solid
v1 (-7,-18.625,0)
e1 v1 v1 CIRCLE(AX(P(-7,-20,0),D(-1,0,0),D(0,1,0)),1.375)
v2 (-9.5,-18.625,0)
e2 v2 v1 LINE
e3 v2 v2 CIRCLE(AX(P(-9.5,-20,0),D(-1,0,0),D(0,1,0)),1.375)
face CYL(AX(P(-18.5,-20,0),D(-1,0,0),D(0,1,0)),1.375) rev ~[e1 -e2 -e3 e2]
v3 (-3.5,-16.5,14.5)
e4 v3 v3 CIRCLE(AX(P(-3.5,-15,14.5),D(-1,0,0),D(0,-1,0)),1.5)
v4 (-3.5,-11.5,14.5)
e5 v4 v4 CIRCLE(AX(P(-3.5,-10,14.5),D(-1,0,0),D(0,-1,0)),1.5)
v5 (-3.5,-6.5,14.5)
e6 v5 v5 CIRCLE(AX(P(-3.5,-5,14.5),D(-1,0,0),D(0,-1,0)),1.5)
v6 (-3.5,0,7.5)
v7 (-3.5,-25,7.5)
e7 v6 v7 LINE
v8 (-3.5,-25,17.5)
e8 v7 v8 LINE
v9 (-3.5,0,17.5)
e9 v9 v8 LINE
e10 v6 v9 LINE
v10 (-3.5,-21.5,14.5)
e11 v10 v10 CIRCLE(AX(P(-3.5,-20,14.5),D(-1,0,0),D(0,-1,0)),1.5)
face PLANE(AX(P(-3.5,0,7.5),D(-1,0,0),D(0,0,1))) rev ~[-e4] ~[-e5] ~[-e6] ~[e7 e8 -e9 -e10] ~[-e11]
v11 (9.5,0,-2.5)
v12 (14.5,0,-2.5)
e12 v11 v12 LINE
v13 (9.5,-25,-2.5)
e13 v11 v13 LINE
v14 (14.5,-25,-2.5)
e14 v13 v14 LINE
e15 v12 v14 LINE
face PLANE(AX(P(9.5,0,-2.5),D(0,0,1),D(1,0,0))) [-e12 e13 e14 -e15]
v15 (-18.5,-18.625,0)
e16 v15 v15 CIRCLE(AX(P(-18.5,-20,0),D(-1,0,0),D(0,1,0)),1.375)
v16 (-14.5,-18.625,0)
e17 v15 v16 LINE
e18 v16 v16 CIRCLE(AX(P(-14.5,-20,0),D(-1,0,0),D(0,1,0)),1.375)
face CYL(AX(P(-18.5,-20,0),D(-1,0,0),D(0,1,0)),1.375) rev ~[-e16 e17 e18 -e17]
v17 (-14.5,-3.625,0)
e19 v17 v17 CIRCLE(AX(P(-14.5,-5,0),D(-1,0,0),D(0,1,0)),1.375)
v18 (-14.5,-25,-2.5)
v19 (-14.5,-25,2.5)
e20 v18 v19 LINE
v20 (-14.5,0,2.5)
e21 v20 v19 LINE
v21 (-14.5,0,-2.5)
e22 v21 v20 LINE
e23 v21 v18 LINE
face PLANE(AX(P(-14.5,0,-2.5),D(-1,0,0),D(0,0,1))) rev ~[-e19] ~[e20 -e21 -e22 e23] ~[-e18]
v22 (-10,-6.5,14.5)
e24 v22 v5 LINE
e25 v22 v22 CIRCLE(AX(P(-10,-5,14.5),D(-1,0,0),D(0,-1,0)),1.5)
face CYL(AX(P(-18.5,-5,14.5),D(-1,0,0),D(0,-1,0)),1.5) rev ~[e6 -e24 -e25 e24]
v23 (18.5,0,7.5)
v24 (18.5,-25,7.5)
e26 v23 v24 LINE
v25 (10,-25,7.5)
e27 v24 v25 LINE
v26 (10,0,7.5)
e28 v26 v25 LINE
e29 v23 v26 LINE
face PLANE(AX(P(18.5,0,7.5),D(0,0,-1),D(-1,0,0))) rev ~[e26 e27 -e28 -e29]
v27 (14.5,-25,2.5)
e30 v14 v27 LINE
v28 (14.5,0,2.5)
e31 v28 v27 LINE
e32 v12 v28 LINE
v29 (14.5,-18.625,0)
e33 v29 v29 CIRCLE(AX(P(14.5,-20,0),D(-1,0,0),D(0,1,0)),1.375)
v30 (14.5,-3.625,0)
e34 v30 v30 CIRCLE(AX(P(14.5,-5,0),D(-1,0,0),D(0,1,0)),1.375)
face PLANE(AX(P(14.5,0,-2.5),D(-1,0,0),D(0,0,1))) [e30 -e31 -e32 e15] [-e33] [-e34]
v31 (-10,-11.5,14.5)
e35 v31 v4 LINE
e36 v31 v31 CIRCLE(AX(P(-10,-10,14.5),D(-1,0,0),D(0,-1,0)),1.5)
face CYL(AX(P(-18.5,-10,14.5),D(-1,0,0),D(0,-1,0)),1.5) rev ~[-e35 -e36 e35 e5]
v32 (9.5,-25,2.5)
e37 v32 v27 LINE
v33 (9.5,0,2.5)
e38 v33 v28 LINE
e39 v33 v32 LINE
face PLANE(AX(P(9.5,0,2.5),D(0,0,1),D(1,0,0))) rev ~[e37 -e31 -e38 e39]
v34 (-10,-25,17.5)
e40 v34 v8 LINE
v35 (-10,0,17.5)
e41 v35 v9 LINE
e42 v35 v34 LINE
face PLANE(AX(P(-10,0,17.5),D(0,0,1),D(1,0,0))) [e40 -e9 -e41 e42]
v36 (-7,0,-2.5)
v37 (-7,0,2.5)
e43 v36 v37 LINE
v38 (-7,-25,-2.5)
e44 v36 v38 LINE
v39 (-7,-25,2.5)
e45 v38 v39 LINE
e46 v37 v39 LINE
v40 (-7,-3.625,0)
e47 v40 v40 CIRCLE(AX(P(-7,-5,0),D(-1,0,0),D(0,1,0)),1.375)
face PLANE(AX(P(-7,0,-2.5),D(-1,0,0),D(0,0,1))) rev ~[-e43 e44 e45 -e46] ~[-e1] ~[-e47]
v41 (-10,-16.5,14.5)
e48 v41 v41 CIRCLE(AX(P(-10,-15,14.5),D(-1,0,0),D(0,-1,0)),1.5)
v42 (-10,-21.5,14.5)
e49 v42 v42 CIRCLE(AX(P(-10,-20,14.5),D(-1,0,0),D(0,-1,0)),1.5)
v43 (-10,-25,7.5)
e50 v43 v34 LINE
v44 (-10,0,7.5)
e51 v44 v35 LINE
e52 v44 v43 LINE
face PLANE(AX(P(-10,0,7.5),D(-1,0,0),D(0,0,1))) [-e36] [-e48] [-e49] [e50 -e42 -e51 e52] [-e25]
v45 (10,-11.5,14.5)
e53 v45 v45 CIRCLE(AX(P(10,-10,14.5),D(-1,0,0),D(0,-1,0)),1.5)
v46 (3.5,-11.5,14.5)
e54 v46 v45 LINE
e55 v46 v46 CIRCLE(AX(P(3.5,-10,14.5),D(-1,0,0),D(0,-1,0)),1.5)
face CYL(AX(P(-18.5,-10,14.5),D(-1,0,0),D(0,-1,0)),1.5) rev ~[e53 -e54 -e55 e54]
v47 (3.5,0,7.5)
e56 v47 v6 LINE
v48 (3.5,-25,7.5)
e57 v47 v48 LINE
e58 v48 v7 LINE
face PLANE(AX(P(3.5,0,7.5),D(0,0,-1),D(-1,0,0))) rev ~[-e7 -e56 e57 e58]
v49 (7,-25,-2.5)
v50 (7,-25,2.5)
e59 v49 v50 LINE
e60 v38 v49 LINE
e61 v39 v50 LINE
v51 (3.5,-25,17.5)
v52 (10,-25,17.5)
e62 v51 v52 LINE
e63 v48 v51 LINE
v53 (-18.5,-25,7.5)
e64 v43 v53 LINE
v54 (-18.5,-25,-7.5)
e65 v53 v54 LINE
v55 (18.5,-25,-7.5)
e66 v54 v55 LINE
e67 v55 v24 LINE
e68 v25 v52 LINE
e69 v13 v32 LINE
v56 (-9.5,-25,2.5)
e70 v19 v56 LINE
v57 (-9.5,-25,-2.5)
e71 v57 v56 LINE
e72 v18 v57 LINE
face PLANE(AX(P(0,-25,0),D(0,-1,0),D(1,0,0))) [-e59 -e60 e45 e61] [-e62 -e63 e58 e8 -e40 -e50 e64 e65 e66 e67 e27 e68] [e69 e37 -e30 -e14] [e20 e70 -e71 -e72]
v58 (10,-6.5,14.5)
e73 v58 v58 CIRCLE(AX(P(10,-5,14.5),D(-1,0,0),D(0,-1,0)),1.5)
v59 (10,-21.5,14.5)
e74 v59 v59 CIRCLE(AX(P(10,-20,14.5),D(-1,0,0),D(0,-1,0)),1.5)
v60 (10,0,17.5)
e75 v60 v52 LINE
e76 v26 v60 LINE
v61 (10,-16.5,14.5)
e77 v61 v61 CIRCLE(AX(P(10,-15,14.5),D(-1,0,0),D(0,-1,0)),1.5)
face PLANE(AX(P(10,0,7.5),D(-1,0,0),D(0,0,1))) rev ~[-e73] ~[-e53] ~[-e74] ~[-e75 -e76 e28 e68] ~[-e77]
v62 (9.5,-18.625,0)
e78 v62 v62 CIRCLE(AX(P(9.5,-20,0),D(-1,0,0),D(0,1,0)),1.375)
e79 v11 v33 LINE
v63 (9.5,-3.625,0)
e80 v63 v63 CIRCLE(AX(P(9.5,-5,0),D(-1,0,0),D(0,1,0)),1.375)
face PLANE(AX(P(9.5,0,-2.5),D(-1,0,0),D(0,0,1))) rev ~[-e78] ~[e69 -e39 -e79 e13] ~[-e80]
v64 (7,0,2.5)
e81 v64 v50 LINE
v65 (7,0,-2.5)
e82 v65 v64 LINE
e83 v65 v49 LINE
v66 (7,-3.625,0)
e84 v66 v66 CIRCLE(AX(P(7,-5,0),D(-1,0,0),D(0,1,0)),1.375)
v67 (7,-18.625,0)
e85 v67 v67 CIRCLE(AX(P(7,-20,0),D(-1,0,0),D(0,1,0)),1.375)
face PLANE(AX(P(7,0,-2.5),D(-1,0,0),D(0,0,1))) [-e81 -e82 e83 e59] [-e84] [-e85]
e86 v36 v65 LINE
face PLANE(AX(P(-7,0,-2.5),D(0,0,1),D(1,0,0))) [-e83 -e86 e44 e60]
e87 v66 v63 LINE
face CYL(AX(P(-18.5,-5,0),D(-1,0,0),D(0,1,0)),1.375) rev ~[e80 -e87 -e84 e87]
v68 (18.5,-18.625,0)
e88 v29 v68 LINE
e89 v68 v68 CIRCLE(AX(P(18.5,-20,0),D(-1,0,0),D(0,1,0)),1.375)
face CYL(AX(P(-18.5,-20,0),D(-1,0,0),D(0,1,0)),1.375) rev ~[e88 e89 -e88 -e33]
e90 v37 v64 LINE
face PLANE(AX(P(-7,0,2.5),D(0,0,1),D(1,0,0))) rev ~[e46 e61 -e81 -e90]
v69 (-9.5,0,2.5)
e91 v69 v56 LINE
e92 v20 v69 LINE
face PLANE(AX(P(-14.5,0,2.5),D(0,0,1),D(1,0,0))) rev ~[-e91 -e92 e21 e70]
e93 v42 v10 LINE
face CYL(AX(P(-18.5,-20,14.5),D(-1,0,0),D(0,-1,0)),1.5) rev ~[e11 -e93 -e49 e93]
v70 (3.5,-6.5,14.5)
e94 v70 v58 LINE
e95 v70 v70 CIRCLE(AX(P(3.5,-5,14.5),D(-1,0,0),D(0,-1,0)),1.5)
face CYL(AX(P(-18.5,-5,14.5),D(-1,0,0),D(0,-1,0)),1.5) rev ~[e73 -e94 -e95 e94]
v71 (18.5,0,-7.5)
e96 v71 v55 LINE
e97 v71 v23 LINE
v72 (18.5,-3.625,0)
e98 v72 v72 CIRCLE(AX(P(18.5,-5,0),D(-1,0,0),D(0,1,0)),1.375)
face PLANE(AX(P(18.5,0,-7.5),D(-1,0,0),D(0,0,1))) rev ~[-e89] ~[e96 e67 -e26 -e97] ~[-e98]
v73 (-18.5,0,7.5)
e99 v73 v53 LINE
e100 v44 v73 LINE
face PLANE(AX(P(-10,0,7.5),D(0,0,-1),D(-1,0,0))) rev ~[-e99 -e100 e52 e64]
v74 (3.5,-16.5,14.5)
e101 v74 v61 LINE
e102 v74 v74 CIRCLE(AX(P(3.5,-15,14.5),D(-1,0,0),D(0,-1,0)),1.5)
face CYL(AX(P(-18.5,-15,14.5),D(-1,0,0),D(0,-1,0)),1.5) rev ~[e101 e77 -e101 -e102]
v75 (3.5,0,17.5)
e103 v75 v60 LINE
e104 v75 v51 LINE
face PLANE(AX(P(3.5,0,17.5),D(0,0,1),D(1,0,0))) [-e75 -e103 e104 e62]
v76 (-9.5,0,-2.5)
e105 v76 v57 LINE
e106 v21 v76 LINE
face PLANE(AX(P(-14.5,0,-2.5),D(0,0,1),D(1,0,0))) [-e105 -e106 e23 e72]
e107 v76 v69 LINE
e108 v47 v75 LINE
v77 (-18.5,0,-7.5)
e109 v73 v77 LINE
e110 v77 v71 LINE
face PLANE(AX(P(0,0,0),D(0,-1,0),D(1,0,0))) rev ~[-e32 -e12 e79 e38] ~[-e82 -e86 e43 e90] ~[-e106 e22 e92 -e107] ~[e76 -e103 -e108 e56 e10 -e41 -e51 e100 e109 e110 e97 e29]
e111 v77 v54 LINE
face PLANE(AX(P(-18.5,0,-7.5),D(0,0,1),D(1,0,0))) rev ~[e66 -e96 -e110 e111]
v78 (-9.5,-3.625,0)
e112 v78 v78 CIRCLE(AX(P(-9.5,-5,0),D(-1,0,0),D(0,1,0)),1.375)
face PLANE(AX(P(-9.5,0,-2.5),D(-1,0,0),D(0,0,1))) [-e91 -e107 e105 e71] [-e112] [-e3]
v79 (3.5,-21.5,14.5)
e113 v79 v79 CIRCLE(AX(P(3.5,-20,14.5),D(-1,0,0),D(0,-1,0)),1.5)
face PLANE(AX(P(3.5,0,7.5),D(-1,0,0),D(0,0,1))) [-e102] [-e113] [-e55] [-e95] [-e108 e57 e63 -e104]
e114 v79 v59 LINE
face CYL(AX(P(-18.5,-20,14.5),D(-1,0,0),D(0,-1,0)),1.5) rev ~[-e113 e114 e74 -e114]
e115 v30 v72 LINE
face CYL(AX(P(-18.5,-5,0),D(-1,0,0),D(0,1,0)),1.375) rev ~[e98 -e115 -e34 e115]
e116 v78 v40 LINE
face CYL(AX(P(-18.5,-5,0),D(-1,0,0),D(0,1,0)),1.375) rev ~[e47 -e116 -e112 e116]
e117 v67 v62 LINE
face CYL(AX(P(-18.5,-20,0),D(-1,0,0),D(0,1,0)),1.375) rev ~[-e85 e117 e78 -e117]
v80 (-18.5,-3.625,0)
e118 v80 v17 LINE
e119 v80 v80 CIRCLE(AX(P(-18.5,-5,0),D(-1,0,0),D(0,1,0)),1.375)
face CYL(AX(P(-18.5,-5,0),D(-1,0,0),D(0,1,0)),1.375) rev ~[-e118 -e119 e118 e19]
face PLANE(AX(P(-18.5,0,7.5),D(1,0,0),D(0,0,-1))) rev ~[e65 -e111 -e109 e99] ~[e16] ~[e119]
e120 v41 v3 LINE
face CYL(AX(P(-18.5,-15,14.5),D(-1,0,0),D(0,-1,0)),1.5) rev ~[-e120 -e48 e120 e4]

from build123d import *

# Parameters (mm, degrees)
F0_W     = 5
F0_H     = 5
F0_W_2   = 14
F0_W_3   = 6.5
F0_H_2   = 10
F1_DEPTH = 25
F2_R     = 1.5
F3_DEPTH = 37


with BuildPart() as f1:
    # F0 (on Front) → F1 (new body)
    with BuildSketch(Plane.XZ):
        Polygon((-18.5, -7.5), (18.5, -7.5), (18.5, 7.5), (10, 7.5), (3.5, 7.5), (-3.5, 7.5), (-10, 7.5), (-18.5, 7.5), align=None)
        with Locations((-12, 0)):
            Rectangle(F0_W, F0_H, mode=Mode.SUBTRACT)
        Rectangle(F0_W_2, F0_H, mode=Mode.SUBTRACT)
        with Locations((12, 0)):
            Rectangle(F0_W, F0_H, mode=Mode.SUBTRACT)
        with Locations((6.75, 12.5)):
            Rectangle(F0_W_3, F0_H_2)
        with Locations((-6.75, 12.5)):
            Rectangle(F0_W_3, F0_H_2)
    extrude(amount=F1_DEPTH)

    # F2 (on face) → F3 (cut, through all)
    with BuildSketch(Plane(origin=(-18.5, 0, 0), x_dir=(0, -1, 0), z_dir=(-1, 0, 0))):
        with Locations((5, 14.5)):
            Circle(F2_R)
        with Locations((10, 14.5)):
            Circle(F2_R)
        with Locations((15, 14.5)):
            Circle(F2_R)
        with Locations((20, 14.5)):
            Circle(F2_R)
        with BuildLine():
            Line((18.625, 0), (21.375, 0))
            ThreePointArc((21.375, 0), (20, 1.375), (18.625, 0))
        make_face()
        with BuildLine():
            Line((3.625, 0), (6.375, 0))
            ThreePointArc((6.375, 0), (5, 1.375), (3.625, 0))
        make_face()
        with BuildLine():
            ThreePointArc((3.625, 0), (5, -1.375), (6.375, 0))
            Line((6.375, 0), (3.625, 0))
        make_face()
        with BuildLine():
            ThreePointArc((18.625, 0), (20, -1.375), (21.375, 0))
            Line((21.375, 0), (18.625, 0))
        make_face()
    extrude(amount=-F3_DEPTH, mode=Mode.SUBTRACT)


solid = f1.part
